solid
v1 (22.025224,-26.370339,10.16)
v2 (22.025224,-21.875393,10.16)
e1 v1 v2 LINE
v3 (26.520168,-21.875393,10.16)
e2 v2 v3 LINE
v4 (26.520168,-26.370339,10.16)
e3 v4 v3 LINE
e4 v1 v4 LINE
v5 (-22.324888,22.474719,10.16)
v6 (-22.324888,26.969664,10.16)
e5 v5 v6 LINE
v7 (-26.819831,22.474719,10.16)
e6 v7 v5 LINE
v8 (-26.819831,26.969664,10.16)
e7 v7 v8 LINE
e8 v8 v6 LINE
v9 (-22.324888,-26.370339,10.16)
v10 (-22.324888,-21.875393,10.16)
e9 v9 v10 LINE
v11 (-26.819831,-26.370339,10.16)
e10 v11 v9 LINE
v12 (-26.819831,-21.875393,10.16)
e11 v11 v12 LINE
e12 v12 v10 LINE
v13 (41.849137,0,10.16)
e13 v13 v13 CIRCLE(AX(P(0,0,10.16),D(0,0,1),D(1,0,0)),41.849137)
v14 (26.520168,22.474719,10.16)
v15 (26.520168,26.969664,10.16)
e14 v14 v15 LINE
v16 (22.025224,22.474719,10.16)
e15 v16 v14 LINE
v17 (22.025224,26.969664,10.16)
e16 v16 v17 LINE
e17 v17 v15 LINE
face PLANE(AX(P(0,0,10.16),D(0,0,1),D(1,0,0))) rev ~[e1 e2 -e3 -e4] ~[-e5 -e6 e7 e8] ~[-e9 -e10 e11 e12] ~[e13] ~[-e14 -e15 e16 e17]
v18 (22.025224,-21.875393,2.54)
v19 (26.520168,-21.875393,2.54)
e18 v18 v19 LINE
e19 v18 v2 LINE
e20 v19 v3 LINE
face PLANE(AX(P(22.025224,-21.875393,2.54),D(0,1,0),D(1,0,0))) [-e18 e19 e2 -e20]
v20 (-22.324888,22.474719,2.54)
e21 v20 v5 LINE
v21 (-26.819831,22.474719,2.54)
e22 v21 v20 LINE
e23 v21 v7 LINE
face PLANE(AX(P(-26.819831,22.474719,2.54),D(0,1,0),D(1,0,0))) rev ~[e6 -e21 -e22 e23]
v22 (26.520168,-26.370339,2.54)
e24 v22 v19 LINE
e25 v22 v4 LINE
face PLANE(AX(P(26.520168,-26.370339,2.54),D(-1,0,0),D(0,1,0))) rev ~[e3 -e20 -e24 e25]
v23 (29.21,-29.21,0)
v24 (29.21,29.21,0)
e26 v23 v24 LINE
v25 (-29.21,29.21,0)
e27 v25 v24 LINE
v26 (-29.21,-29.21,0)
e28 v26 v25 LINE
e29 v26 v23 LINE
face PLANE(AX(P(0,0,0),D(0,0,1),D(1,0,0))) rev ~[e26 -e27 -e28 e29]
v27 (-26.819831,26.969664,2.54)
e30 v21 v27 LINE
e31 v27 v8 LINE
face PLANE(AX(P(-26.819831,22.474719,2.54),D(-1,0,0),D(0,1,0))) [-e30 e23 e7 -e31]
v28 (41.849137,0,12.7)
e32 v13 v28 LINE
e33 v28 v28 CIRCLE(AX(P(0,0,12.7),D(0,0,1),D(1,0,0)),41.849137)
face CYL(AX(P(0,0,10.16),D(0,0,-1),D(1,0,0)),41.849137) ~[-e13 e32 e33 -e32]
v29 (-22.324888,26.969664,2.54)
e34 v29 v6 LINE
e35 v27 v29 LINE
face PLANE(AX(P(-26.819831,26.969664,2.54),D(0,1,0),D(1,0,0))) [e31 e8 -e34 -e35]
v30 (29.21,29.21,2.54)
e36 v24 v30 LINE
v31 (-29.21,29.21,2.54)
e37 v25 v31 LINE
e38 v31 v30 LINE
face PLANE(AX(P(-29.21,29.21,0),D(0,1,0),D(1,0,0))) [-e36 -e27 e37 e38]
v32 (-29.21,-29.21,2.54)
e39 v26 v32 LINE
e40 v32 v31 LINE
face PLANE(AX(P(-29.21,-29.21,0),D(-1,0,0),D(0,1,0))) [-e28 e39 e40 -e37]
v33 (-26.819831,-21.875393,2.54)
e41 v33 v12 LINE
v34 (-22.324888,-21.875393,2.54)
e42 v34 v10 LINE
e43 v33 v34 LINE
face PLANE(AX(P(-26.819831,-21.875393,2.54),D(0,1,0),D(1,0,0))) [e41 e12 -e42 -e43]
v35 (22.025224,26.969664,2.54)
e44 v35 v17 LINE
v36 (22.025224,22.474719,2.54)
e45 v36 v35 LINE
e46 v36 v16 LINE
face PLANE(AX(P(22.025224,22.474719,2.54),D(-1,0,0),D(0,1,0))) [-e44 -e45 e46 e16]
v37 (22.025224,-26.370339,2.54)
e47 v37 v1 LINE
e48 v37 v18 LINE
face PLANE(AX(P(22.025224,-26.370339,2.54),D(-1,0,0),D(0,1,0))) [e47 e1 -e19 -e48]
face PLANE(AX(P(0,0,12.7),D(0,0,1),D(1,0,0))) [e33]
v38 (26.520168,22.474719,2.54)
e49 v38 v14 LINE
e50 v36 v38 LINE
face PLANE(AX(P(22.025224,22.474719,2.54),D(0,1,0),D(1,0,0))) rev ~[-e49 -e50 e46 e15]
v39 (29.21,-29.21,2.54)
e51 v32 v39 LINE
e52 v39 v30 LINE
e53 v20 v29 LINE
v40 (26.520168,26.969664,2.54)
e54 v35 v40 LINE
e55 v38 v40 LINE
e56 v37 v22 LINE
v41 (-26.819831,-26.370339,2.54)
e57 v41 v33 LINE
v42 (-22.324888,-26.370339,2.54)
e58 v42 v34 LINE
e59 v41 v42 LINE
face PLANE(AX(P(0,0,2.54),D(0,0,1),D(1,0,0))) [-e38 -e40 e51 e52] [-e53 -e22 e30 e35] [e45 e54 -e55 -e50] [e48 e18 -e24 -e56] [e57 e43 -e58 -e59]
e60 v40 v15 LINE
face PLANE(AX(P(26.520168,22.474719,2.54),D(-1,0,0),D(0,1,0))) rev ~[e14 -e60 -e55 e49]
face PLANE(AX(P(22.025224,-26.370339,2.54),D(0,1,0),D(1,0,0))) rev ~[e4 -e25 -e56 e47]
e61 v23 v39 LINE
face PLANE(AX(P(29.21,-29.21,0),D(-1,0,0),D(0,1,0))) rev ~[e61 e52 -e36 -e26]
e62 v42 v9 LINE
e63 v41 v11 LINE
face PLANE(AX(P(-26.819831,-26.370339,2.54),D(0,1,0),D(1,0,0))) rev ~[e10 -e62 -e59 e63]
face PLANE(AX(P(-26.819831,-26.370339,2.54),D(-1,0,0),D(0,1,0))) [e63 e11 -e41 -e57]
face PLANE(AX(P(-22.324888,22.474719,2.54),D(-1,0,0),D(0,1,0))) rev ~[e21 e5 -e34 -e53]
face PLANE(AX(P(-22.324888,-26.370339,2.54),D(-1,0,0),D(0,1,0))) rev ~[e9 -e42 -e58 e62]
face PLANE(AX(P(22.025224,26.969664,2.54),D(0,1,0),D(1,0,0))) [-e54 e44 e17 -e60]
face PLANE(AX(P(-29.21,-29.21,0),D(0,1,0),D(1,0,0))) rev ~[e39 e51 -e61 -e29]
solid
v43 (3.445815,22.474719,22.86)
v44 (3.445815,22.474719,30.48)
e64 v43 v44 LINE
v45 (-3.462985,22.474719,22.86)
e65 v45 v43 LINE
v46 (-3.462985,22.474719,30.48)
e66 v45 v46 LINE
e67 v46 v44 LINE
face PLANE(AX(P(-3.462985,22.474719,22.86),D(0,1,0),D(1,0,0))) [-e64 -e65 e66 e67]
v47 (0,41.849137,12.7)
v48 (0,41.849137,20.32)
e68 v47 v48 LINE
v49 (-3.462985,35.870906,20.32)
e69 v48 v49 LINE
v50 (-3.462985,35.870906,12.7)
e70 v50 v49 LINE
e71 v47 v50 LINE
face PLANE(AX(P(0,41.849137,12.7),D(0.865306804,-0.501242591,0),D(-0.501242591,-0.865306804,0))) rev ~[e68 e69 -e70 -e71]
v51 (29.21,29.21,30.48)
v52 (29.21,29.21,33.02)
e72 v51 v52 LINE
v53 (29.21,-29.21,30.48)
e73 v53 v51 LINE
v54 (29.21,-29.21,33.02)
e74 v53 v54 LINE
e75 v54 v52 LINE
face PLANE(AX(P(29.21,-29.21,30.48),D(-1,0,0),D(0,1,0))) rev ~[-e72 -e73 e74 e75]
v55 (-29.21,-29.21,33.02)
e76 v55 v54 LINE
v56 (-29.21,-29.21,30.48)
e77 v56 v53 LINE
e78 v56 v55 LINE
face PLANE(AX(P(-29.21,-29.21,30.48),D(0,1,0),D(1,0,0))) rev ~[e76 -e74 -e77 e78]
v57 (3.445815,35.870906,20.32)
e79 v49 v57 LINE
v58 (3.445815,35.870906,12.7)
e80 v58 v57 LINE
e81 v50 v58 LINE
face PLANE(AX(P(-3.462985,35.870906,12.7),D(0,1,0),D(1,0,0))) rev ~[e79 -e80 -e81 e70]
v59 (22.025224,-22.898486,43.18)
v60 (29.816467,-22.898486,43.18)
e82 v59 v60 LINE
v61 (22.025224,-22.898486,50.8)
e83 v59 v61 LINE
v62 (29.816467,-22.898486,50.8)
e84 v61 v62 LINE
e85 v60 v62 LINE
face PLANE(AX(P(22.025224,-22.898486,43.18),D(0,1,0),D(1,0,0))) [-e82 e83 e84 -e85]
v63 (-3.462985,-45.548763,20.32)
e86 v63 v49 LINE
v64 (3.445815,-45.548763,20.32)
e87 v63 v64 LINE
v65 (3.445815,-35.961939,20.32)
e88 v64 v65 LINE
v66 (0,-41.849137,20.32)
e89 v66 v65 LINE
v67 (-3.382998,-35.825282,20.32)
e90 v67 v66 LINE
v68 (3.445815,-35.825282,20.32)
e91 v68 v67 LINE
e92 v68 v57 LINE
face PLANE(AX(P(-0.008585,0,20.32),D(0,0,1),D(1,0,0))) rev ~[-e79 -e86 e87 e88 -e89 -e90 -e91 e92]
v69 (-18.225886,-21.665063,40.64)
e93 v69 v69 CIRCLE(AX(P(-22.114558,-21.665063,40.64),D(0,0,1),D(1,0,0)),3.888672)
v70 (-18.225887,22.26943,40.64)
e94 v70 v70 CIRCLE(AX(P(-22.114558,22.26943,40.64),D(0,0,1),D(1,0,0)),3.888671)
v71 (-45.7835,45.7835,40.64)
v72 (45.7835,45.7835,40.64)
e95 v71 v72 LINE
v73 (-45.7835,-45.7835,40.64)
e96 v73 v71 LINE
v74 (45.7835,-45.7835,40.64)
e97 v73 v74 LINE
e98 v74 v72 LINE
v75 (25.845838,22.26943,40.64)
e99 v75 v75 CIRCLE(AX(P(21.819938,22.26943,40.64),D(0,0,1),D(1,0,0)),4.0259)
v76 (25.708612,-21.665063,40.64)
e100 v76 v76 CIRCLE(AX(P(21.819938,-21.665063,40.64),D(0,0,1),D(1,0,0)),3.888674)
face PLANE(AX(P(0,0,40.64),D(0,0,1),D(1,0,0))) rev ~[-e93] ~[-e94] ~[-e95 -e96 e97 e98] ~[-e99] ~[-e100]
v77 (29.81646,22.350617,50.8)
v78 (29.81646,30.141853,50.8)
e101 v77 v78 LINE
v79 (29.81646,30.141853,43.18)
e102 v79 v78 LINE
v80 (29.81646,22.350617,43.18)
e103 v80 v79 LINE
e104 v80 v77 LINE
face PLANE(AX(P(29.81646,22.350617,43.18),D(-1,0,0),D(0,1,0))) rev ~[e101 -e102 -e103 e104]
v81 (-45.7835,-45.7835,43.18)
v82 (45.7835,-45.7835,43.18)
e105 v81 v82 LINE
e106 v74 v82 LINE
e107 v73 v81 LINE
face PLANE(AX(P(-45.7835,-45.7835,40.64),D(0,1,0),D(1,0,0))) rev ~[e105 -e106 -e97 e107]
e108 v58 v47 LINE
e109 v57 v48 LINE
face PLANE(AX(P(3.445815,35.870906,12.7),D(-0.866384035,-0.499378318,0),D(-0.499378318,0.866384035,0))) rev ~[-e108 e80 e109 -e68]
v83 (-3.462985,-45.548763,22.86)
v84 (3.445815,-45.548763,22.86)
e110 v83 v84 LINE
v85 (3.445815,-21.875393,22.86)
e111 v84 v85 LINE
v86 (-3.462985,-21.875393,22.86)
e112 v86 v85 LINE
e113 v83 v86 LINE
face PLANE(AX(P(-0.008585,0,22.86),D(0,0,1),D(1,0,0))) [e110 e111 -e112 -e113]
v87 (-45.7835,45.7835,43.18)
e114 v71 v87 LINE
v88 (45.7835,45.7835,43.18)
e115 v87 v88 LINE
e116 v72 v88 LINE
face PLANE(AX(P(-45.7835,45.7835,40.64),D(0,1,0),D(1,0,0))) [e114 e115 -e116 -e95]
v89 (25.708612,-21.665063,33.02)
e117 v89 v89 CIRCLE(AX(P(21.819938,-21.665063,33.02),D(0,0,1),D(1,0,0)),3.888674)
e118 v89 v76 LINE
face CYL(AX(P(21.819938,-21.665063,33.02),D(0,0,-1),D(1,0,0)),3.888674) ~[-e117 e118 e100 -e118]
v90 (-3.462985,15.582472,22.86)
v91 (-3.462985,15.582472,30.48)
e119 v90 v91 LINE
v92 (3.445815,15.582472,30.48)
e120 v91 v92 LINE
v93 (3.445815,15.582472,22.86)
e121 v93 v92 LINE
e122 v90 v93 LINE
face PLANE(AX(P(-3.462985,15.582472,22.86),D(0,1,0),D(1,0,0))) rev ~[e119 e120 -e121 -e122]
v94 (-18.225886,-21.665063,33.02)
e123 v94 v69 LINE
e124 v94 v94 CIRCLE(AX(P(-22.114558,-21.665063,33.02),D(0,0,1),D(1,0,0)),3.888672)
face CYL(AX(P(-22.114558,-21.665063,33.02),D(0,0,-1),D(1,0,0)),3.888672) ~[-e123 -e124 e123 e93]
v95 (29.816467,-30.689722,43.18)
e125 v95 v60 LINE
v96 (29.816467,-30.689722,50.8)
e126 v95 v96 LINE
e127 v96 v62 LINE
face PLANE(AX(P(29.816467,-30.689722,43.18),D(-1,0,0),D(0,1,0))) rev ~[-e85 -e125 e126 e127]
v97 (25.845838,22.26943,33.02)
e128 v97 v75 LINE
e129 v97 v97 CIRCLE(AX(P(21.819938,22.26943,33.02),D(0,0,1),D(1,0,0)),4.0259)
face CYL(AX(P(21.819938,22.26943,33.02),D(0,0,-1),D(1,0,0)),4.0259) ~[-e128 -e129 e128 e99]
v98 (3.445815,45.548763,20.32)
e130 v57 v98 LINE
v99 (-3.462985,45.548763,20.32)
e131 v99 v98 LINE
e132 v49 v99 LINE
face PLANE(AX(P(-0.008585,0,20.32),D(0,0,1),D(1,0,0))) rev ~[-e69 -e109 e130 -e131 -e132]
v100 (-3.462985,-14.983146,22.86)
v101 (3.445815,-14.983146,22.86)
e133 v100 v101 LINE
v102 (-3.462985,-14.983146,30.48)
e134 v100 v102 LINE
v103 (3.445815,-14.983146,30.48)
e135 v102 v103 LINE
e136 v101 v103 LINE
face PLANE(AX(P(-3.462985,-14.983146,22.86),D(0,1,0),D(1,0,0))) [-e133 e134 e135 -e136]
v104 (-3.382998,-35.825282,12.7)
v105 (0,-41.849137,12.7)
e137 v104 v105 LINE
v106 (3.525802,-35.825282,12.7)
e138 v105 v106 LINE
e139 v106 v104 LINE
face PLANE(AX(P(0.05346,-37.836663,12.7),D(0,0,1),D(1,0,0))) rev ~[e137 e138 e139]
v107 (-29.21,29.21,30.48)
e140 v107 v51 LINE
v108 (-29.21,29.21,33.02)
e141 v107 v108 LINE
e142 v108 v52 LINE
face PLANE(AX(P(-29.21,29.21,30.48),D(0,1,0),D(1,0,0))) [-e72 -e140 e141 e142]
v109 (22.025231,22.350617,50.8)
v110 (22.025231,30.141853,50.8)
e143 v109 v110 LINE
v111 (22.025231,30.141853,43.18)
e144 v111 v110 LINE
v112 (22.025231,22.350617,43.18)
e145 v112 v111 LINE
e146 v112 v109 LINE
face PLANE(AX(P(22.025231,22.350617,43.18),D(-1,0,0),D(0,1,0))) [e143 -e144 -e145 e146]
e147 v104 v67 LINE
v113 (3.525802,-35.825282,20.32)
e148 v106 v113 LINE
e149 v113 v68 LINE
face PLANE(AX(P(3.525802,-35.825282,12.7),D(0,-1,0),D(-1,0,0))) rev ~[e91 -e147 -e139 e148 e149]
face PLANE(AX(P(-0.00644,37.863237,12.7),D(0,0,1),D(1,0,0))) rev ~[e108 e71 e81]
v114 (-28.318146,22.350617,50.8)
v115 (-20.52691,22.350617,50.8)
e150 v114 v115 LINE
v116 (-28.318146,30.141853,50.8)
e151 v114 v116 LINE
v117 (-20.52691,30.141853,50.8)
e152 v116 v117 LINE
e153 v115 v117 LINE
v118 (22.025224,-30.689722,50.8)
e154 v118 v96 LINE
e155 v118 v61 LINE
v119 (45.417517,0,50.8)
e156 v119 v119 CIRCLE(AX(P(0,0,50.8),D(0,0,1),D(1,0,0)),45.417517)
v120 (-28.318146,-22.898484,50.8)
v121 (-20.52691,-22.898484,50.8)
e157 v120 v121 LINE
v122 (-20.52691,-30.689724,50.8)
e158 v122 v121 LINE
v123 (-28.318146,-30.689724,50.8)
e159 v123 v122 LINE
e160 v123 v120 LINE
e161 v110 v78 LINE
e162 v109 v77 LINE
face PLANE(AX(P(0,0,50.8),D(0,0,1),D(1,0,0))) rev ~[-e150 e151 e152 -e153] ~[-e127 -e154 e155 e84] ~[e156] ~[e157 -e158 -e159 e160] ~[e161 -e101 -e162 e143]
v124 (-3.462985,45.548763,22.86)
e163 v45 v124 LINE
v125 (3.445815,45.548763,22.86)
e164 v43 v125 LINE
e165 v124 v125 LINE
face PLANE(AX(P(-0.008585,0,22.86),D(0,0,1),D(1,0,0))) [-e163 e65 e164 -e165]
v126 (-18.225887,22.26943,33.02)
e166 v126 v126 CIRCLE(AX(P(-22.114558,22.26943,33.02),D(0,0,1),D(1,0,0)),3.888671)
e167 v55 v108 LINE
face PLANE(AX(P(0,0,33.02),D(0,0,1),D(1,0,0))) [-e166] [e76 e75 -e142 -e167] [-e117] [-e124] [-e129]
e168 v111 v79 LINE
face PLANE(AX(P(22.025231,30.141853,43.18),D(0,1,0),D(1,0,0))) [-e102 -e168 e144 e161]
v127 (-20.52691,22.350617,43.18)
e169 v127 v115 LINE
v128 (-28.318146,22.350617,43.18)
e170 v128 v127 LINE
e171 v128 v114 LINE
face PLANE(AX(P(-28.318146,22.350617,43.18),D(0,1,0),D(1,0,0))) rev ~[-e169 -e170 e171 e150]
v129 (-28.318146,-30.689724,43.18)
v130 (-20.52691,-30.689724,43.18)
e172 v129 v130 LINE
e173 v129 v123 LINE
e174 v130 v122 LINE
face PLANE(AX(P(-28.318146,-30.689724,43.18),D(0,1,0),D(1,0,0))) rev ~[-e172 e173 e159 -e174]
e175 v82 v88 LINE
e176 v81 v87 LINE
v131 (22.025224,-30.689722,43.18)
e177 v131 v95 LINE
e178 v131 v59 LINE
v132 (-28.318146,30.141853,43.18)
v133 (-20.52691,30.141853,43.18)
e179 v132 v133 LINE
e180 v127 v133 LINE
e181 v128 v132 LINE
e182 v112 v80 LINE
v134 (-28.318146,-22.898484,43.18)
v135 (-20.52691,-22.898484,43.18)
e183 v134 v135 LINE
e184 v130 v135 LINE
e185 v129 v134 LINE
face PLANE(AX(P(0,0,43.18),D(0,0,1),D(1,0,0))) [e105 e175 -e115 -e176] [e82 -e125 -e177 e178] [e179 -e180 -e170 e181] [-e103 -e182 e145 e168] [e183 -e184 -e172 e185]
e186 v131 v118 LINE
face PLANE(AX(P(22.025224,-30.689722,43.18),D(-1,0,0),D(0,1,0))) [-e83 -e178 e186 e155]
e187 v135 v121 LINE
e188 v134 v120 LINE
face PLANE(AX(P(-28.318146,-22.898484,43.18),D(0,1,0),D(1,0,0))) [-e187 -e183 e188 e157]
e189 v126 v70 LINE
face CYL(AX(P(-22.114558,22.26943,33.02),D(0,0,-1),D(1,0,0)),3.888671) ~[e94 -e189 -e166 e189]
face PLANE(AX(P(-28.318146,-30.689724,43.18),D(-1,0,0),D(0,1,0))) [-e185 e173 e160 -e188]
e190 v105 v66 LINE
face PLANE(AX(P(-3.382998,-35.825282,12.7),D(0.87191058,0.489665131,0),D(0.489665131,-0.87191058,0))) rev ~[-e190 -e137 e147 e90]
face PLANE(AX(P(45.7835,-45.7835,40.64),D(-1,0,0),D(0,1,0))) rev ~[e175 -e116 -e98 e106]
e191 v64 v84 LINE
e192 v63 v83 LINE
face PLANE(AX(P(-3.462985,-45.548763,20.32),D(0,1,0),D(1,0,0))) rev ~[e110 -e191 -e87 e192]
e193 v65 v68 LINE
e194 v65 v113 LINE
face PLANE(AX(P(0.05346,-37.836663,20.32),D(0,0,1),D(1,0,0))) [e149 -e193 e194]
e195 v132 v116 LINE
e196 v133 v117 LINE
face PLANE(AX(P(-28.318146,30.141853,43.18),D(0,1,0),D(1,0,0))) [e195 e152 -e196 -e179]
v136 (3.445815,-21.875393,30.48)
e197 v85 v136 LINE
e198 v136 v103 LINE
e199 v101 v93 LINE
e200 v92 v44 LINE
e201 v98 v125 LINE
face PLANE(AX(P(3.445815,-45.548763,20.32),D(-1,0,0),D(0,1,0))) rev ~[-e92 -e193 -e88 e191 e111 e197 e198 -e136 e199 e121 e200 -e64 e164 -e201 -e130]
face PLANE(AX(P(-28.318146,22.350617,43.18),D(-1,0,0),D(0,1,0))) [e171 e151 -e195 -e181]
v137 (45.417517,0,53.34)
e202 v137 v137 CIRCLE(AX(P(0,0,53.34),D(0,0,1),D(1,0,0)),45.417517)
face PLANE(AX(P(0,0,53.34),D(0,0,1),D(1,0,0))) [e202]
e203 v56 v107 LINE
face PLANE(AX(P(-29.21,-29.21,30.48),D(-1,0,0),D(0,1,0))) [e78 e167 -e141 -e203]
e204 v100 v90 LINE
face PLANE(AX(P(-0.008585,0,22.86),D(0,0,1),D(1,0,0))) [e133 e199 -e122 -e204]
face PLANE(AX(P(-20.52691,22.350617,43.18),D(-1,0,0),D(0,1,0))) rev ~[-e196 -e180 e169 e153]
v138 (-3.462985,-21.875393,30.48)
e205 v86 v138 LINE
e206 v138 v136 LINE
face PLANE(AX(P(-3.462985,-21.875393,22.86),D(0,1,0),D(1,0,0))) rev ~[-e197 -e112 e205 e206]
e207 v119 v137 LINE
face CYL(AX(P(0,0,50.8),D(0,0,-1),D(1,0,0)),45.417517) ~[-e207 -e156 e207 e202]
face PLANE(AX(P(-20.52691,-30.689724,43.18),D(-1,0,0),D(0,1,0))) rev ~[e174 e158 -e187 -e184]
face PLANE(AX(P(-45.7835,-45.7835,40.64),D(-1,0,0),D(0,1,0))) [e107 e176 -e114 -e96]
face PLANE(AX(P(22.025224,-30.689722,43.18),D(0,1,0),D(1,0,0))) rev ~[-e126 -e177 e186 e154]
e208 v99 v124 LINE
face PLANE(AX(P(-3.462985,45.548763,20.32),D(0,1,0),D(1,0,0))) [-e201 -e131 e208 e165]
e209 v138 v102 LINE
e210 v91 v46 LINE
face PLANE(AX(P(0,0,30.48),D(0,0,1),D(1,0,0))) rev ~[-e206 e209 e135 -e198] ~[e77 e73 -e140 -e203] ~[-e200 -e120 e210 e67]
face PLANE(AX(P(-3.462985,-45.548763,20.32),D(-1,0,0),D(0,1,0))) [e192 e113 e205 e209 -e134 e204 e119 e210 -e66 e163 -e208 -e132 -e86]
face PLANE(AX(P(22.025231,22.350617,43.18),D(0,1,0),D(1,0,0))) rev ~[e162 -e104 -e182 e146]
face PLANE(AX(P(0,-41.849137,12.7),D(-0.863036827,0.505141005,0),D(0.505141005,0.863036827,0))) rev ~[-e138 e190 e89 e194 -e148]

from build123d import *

# Parameters (mm, degrees)
F0_W      = 58.42
F0_H      = 58.42
F1_DEPTH  = 2.54
F2_W      = 4.4949427247
F2_H      = 4.4949445873
F3_DEPTH  = 7.62
F4_W      = 4.4949445873
F4_H      = 4.4949445873
F5_DEPTH  = 7.62
F6_W      = 4.4949427247
F6_H      = 4.49494645
F7_DEPTH  = 7.62
F8_W      = 4.4949445873
F8_H      = 4.49494645
F9_DEPTH  = 7.62
F10_R     = 41.8491374304
F11_DEPTH = 2.54
F13_DEPTH = 7.62
F15_DEPTH = 7.62
F16_W     = 6.9088
F16_H     = 91.0975262523
F17_DEPTH = 2.54
F18_W     = 6.9088
F18_H     = 6.8922471255
F19_DEPTH = 7.62
F20_W     = 6.9088
F20_H     = 6.8922471255
F21_DEPTH = 7.62
F22_W     = 58.42
F22_H     = 58.42
F23_DEPTH = 2.54
F24_R     = 3.8886710073
F24_R_2   = 3.8886723427
F24_R_3   = 3.8886735446
F24_R_4   = 4.0259
F25_DEPTH = 7.62
F26_W     = 91.567
F26_H     = 91.567
F27_DEPTH = 2.54
F28_W     = 7.791236043
F28_H     = 7.791236043
F28_W_2   = 7.7912285924
F28_W_3   = 7.7912434936
F28_H_2   = 7.7912397683
F29_DEPTH = 7.62
F30_R     = 45.4175170009
F31_DEPTH = 2.54


with BuildPart() as f1:
    # F0 (on Top) → F1 (new body)
    with BuildSketch(Plane.XY):
        Rectangle(F0_W, F0_H)
    extrude(amount=F1_DEPTH)

    # F2 (on face) → F3 (join)
    with BuildSketch(Plane.XY.offset(2.54)):
        with Locations((-24.572359398, 24.7221915051)):
            Rectangle(F2_W, F2_H)
    extrude(amount=F3_DEPTH)

    # F4 (on face) → F5 (join)
    with BuildSketch(Plane.XY.offset(2.54)):
        with Locations((24.2726961151, 24.7221915051)):
            Rectangle(F4_W, F4_H)
    extrude(amount=F5_DEPTH)

    # F6 (on face) → F7 (join)
    with BuildSketch(Plane.XY.offset(2.54)):
        with Locations((-24.572359398, -24.1228658706)):
            Rectangle(F6_W, F6_H)
    extrude(amount=F7_DEPTH)

    # F8 (on face) → F9 (join)
    with BuildSketch(Plane.XY.offset(2.54)):
        with Locations((24.2726961151, -24.1228658706)):
            Rectangle(F8_W, F8_H)
    extrude(amount=F9_DEPTH)

    # F10 (on face) → F11 (join)
    with BuildSketch(Plane.XY.offset(10.16)):
        Circle(F10_R)
    extrude(amount=F11_DEPTH)


with BuildPart() as f13:
    # F12 (on face) → F13 (new body)
    with BuildSketch(Plane.XY.offset(12.7)):
        Polygon((3.445815184, 35.8709057852), (0, 41.8491374304), (-3.462984816, 35.8709057852), align=None)
    extrude(amount=F13_DEPTH)



with BuildPart() as f15:
    # F14 (on face) → F15 (new body)
    with BuildSketch(Plane.XY.offset(12.7)):
        Polygon((-3.3829984536, -35.8252816135), (0, -41.8491374304), (3.5258015464, -35.8252816135), align=None)
    extrude(amount=F15_DEPTH)


with BuildPart() as f13_1:
    add(f13.part)

    add(f15.part)  # F17 merges F15
    # F16 (on face) → F17 (join)
    with BuildSketch(Plane.XY.offset(20.32)):
        with Locations((-0.008584816, 0)):
            Rectangle(F16_W, F16_H)
    extrude(amount=F17_DEPTH)

    # F18 (on face) → F19 (join)
    with BuildSketch(Plane.XY.offset(22.86)):
        with Locations((-0.008584816, 19.0285956487)):
            Rectangle(F18_W, F18_H)
    extrude(amount=F19_DEPTH)

    # F20 (on face) → F21 (join)
    with BuildSketch(Plane.XY.offset(22.86)):
        with Locations((-0.008584816, -18.4292690828)):
            Rectangle(F20_W, F20_H)
    extrude(amount=F21_DEPTH)

    # F22 (on face) → F23 (join)
    with BuildSketch(Plane.XY.offset(30.48)):
        Rectangle(F22_W, F22_H)
    extrude(amount=F23_DEPTH)

    # F24 (on face) → F25 (join)
    with BuildSketch(Plane.XY.offset(33.02)):
        with Locations((-22.114558397, 22.2694298633)):
            Circle(F24_R)
        with Locations((-22.114558397, -21.665063095)):
            Circle(F24_R_2)
        with Locations((21.8199381546, -21.665063095)):
            Circle(F24_R_3)
        with Locations((21.8199381546, 22.2694298633)):
            Circle(F24_R_4)
    extrude(amount=F25_DEPTH)

    # F26 (on face) → F27 (join)
    with BuildSketch(Plane.XY.offset(40.64)):
        Rectangle(F26_W, F26_H)
    extrude(amount=F27_DEPTH)

    # F28 (on face) → F29 (join)
    with BuildSketch(Plane.XY.offset(43.18)):
        with Locations((-24.4225282222, 26.2462347746)):
            Rectangle(F28_W, F28_H)
        with Locations((25.9208455682, 26.2462347746)):
            Rectangle(F28_W_2, F28_H)
        with Locations((25.9208455682, -26.7941039056)):
            Rectangle(F28_W_3, F28_H)
        with Locations((-24.4225282222, -26.7941039056)):
            Rectangle(F28_W, F28_H_2)
    extrude(amount=F29_DEPTH)

    # F30 (on face) → F31 (join)
    with BuildSketch(Plane.XY.offset(50.8)):
        Circle(F30_R)
    extrude(amount=F31_DEPTH)


solid = Compound([f1.part, f13_1.part])
